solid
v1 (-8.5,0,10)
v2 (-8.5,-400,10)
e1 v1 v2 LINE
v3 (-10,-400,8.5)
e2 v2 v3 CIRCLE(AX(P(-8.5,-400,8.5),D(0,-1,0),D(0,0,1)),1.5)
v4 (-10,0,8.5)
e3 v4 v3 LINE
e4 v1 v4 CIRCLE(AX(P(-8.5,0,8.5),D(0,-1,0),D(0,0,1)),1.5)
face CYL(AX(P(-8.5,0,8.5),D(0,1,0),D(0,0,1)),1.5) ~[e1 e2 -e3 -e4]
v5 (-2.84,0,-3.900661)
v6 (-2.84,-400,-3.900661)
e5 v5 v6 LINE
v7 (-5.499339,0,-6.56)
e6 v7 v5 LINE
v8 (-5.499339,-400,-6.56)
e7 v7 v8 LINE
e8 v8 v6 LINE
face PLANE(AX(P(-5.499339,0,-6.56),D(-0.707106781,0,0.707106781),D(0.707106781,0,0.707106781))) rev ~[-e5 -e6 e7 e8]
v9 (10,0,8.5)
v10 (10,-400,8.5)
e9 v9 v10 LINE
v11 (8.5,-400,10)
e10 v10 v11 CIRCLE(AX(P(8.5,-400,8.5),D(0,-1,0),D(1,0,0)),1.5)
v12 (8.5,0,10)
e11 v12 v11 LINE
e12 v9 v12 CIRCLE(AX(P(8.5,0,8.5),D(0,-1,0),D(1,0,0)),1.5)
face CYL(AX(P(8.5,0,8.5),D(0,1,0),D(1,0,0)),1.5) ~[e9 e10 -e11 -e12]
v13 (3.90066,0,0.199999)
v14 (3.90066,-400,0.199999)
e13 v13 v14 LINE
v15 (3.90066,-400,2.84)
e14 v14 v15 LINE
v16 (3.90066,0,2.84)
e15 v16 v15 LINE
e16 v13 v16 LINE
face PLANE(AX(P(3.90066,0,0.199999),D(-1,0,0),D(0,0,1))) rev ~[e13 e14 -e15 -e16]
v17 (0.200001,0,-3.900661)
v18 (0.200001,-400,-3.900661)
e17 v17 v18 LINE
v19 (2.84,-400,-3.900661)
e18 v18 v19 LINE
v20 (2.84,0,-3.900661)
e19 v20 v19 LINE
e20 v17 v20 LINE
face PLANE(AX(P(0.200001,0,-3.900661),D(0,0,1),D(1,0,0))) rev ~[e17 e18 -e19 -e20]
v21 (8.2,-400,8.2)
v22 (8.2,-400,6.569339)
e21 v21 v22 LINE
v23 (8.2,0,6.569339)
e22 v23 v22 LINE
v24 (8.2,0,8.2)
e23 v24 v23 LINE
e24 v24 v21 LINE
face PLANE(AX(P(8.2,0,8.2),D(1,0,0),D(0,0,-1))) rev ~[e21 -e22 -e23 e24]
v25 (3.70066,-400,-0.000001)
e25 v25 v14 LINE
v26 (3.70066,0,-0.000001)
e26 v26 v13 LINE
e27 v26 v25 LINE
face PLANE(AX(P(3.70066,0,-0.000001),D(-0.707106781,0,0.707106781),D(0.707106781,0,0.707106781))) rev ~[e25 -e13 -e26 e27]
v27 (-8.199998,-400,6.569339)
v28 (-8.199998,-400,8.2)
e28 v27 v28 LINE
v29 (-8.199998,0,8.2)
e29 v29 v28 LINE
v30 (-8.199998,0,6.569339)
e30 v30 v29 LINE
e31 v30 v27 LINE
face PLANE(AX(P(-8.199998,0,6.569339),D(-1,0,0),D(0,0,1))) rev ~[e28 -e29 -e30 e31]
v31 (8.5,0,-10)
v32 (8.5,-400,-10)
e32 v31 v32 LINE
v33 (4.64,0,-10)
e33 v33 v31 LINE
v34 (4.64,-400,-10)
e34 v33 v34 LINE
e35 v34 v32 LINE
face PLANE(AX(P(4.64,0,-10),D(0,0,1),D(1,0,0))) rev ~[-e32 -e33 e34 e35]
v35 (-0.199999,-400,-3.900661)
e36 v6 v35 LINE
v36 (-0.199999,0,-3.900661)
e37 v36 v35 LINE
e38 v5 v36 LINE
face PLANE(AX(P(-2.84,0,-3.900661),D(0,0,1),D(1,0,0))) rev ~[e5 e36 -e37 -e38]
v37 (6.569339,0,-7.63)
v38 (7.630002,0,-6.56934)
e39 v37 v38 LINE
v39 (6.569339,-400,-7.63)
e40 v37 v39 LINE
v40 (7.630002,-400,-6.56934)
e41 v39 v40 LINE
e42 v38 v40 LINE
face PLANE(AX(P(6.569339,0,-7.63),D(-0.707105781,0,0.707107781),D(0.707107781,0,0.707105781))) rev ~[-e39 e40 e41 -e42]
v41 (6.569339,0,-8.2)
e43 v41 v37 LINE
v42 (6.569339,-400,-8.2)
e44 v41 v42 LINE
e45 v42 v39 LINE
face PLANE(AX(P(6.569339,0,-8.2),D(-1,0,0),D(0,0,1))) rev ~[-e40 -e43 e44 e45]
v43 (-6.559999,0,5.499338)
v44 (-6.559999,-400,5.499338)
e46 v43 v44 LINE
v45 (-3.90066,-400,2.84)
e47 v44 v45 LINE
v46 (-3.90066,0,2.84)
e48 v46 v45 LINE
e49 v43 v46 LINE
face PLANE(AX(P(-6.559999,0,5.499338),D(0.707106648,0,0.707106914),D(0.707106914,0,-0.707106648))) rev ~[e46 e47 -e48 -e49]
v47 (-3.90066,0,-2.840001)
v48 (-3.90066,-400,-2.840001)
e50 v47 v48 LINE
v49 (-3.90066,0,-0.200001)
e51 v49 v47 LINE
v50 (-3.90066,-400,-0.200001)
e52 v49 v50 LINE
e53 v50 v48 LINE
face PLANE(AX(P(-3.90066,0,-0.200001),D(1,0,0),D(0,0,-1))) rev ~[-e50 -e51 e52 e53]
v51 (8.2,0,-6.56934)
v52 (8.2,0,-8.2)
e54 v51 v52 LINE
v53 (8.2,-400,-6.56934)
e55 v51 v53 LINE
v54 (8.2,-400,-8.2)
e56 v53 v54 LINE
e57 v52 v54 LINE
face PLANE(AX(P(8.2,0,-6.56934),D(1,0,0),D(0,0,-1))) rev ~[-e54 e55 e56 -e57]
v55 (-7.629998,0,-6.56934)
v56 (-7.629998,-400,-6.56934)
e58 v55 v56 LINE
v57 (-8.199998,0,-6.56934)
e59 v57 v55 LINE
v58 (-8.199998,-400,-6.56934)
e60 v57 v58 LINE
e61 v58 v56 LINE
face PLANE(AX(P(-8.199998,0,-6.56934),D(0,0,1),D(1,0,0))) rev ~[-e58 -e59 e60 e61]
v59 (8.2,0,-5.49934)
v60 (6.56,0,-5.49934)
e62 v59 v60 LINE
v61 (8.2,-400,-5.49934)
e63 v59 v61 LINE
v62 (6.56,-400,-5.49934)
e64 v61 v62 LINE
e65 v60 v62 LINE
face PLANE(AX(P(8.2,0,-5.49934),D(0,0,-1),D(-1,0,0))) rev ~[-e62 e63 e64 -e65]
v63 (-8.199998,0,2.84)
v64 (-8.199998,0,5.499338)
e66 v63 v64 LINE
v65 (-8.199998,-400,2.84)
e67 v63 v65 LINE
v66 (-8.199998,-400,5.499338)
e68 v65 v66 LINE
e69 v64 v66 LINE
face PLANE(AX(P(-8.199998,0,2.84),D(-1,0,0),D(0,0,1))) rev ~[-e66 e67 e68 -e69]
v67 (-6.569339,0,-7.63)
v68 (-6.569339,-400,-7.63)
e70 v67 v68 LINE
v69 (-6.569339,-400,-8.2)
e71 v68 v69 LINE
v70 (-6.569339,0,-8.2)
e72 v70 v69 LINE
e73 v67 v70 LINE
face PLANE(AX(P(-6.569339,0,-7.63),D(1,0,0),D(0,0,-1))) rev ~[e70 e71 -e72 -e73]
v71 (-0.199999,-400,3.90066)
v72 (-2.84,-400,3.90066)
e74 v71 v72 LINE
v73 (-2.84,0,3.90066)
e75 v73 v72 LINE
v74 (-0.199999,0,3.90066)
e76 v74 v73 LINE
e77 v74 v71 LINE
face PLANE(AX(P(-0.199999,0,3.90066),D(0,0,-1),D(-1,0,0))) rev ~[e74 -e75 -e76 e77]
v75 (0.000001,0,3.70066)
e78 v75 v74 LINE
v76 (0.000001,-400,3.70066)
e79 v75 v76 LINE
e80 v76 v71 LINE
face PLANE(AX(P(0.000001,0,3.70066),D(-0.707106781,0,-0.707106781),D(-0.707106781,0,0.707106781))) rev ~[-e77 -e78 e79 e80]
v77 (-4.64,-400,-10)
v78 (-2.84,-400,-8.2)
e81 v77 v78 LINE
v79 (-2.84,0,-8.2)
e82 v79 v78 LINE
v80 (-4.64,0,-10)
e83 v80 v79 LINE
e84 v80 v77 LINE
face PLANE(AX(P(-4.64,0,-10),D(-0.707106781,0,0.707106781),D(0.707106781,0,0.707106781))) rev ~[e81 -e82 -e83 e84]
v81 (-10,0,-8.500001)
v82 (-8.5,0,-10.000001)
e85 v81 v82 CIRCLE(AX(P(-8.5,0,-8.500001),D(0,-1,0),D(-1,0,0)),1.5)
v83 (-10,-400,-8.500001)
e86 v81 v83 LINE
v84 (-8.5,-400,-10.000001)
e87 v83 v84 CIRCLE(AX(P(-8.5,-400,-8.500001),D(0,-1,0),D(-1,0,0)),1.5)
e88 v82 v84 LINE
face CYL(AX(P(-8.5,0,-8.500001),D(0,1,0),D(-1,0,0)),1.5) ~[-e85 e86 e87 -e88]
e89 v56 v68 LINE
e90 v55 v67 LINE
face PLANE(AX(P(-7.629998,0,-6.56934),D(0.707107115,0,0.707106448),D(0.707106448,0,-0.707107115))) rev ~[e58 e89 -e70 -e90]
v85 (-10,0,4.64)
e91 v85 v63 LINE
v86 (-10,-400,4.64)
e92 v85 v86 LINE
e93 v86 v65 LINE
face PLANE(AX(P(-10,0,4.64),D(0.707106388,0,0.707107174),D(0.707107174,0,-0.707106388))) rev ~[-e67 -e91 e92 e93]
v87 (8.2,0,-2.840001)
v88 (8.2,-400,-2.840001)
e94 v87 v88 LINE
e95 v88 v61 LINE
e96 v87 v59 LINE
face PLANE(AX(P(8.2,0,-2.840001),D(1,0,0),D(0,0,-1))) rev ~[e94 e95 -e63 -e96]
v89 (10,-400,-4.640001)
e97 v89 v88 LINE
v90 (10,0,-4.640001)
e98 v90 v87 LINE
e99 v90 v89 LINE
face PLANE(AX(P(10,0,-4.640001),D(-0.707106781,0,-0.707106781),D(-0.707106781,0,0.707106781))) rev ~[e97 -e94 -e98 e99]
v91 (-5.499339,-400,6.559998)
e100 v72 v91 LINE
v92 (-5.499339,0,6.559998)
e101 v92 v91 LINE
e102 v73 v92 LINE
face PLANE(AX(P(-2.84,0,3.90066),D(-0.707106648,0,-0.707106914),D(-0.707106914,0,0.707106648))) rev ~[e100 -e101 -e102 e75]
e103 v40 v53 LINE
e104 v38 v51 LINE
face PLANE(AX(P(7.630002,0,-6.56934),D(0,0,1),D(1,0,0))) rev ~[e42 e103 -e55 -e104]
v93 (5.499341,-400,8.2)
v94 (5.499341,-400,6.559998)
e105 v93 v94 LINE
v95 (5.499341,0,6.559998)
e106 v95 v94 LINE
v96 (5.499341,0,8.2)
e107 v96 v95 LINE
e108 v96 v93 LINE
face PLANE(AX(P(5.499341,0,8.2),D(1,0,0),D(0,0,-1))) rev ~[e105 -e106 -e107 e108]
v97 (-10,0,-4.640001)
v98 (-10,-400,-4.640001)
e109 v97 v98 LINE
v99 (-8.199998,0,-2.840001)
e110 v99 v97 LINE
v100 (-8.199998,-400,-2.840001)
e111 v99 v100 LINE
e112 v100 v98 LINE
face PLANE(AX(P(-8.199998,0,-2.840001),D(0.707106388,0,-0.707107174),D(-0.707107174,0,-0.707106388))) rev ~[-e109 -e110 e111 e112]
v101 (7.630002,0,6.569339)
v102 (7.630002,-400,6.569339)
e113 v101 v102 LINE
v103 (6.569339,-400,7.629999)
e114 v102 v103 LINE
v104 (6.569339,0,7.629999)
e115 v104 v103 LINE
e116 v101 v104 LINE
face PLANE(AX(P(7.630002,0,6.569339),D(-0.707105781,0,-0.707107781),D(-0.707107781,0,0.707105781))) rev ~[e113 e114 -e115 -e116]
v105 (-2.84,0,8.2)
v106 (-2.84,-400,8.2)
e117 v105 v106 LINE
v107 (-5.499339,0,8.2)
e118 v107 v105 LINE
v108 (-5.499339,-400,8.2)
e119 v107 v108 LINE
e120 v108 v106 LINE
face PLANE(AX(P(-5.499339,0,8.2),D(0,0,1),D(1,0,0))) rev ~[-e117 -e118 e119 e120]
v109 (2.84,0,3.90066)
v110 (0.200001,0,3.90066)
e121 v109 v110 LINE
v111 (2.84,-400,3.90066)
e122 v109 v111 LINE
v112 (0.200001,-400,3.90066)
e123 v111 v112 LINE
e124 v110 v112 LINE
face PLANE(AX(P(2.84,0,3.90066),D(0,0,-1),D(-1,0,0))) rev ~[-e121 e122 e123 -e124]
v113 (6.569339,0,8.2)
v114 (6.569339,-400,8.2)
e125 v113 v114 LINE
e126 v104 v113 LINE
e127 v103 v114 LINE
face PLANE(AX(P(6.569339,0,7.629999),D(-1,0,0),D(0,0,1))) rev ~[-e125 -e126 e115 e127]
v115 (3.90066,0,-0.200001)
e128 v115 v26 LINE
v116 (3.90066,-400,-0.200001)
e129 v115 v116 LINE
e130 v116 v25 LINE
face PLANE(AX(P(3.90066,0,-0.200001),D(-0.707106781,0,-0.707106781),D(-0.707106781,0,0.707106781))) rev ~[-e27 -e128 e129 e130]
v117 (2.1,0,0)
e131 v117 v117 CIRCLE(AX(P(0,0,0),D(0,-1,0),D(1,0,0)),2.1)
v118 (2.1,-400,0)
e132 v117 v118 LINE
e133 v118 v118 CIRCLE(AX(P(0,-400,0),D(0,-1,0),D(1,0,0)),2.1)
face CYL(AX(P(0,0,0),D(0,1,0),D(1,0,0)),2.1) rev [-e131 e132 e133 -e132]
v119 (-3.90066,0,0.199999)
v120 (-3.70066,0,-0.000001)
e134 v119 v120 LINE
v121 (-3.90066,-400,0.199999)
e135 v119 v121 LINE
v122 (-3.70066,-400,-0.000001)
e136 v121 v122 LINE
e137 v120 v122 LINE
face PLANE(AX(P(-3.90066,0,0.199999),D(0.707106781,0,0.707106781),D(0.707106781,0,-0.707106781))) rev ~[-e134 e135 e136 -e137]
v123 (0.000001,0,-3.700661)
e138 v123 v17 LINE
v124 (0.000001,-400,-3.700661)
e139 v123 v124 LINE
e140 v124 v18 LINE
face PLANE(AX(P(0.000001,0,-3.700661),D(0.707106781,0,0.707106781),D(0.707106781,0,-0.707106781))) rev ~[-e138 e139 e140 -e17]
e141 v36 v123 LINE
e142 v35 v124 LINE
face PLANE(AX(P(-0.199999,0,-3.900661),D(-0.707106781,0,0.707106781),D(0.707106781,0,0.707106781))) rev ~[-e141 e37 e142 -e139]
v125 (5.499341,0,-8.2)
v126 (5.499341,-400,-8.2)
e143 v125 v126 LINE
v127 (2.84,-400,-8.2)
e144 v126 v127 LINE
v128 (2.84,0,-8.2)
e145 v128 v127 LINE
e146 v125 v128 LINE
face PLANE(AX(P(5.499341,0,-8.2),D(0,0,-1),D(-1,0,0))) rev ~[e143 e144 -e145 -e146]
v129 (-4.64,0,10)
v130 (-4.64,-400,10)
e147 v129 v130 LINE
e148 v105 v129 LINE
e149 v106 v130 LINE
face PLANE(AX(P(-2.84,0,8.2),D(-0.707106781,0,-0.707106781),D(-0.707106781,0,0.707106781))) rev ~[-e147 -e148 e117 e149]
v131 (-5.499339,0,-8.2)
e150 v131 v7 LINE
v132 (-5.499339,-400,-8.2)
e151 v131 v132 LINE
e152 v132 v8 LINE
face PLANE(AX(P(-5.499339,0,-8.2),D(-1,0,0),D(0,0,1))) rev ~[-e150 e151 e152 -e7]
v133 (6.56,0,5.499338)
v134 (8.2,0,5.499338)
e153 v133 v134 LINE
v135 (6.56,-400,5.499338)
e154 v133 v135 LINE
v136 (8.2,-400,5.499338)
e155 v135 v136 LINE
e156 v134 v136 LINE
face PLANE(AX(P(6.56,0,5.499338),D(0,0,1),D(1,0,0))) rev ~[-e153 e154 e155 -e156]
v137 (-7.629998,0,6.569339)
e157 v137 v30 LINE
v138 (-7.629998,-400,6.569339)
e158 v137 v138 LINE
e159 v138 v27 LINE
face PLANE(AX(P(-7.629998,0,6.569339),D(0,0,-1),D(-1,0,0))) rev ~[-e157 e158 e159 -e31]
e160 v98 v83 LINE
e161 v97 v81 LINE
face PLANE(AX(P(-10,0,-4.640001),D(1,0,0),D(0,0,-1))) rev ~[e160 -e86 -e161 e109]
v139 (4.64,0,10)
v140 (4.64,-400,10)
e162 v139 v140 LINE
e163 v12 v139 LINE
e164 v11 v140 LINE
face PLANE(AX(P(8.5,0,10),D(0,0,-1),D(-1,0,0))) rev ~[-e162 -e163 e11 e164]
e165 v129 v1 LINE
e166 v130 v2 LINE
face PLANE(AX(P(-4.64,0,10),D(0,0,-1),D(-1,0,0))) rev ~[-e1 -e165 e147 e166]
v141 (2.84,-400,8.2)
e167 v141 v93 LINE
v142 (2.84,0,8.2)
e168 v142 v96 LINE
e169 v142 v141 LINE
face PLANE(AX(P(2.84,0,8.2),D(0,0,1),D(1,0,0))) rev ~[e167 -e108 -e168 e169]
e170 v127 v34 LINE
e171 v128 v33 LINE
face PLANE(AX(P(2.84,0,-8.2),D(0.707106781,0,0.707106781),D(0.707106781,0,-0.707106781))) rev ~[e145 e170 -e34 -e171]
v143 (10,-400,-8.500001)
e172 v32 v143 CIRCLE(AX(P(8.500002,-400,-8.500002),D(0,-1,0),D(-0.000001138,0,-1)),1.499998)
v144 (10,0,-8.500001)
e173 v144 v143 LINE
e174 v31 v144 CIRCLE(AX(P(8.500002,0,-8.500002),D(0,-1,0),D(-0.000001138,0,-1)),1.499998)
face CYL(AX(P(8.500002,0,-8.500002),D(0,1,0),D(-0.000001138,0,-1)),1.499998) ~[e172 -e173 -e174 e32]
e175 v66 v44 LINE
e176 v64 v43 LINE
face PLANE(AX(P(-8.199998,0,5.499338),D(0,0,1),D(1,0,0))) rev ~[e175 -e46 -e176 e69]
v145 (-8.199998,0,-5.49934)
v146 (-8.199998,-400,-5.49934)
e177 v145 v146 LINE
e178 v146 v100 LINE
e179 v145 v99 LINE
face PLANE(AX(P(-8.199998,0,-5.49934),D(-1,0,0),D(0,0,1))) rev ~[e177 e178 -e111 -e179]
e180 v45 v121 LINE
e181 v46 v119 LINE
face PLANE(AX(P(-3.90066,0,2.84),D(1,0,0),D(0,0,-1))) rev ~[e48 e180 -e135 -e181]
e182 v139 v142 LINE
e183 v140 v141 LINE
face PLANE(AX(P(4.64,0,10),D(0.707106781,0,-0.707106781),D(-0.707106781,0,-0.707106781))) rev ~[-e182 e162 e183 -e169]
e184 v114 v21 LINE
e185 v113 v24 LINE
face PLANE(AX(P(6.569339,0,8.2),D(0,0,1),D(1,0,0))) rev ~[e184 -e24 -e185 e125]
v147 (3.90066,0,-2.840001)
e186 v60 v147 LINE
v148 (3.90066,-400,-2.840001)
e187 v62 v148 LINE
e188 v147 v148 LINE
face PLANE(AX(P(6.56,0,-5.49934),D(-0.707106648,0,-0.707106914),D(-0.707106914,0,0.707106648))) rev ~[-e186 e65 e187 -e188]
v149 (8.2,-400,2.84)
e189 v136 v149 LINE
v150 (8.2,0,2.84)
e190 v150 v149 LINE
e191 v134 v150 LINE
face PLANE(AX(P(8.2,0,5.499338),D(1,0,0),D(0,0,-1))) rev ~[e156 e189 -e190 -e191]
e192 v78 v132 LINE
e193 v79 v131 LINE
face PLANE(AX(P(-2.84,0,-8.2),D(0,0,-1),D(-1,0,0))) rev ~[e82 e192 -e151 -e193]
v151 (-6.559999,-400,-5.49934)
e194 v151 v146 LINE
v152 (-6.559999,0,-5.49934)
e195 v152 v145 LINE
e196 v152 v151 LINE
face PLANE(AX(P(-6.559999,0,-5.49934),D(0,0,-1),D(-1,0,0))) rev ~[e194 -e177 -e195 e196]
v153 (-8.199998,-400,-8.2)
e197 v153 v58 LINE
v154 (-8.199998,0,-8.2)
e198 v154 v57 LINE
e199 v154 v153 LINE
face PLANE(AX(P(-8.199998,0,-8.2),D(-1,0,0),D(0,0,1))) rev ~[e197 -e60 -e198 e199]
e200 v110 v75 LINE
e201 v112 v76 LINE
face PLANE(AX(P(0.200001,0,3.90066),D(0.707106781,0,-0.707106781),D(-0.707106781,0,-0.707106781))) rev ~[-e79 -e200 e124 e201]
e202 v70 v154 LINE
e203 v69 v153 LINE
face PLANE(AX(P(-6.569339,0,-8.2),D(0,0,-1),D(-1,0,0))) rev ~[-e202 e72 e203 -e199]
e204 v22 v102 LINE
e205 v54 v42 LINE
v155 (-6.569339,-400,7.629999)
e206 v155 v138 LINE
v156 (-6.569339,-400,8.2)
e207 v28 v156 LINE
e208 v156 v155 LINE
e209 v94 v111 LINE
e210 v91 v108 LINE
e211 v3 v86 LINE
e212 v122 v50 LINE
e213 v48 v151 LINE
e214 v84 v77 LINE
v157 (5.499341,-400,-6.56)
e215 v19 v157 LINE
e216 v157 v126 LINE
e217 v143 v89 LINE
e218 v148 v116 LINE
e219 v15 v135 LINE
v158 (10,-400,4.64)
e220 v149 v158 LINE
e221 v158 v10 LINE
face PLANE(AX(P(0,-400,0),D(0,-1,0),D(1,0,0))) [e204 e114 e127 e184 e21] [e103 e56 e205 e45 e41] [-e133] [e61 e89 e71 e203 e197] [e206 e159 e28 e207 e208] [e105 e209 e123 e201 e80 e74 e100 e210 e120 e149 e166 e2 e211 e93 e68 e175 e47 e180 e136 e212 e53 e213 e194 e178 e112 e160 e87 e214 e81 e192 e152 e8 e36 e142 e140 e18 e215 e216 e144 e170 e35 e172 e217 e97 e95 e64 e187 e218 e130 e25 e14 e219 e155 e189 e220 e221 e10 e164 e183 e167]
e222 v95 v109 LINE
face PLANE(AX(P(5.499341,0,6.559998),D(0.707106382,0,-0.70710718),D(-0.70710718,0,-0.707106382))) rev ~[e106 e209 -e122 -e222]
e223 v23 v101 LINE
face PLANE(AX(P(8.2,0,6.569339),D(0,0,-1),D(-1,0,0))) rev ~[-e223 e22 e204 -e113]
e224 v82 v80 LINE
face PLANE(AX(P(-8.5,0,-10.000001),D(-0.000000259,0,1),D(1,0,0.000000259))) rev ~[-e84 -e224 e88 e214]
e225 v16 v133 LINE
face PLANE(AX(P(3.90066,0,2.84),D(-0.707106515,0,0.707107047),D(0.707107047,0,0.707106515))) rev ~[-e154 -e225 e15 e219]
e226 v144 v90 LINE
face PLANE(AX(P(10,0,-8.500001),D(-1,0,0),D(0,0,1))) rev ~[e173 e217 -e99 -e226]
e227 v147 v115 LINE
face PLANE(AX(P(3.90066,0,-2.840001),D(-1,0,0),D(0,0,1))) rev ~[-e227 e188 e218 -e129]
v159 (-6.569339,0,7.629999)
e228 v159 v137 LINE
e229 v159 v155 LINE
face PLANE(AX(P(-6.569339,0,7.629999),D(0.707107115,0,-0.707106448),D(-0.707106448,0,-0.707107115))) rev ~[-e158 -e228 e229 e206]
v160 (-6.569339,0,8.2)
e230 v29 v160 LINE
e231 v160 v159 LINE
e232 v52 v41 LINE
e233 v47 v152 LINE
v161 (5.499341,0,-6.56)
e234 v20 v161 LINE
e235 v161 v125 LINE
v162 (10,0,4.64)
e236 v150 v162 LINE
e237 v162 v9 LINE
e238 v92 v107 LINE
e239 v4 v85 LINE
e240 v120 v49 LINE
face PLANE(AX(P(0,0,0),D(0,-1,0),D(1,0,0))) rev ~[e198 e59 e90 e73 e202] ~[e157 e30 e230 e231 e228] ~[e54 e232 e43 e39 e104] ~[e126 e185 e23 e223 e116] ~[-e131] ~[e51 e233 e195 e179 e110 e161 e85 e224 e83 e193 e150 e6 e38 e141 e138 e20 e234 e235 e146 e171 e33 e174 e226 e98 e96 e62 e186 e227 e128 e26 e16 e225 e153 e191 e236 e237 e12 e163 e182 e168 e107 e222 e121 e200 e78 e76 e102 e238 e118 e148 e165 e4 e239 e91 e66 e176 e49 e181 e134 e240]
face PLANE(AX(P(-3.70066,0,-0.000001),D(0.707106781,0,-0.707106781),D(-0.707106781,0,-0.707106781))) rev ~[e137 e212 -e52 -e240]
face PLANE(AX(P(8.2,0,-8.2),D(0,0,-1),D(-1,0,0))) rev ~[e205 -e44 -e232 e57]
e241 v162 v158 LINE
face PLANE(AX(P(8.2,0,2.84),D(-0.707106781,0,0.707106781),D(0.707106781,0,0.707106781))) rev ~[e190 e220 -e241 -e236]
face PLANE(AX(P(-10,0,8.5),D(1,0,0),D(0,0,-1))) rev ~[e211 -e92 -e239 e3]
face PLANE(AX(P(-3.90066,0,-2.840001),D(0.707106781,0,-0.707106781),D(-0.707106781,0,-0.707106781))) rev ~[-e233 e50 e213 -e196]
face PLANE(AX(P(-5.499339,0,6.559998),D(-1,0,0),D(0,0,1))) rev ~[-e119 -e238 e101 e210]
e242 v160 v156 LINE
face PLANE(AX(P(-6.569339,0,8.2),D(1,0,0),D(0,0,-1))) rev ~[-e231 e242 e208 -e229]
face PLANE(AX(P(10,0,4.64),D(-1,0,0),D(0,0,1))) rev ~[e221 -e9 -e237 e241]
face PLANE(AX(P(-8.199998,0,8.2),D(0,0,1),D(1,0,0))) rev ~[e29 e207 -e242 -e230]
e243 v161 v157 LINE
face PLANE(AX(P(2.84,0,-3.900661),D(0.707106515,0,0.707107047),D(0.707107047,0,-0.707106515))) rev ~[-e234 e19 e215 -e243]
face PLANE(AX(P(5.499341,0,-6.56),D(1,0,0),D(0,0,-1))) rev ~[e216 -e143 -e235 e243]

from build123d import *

# Parameters (mm, degrees)
F0_R     = 2.09999979
F1_DEPTH = 400


# Not quite as in the source:
# - ends of sketch curves that miss each other by under 0.0002 mm in the source are joined


with BuildPart() as f1:
    # F0 (on Front) → F1 (new body)
    with BuildSketch(Plane.XZ):
        with BuildLine():
            Line((-4.639999536, 10), (-8.50000015, 10))
            ThreePointArc((-8.50000015, 10), (-9.5606602157, 9.5606602157), (-10, 8.50000015))
            Line((-10, 8.50000015), (-10, 4.639999536))
            Line((-10, 4.639999536), (-8.19999818, 2.839999716))
            Line((-8.19999818, 2.839999716), (-8.19999818, 5.4993384501))
            Line((-8.19999818, 5.4993384501), (-6.559999344, 5.4993384501))
            Line((-6.559999344, 5.4993384501), (-3.9006596099, 2.839999716))
            Line((-3.9006596099, 2.839999716), (-3.9006596099, 0.19999898))
            Line((-3.9006596099, 0.19999898), (-3.7006596299, -1e-06))
            Line((-3.7006596299, -1e-06), (-3.9006596099, -0.20000098))
            Line((-3.9006596099, -0.20000098), (-3.9006596099, -2.840000716))
            Line((-3.9006596099, -2.840000716), (-6.559999344, -5.4993404501))
            Line((-6.559999344, -5.4993404501), (-8.19999818, -5.4993404501))
            Line((-8.19999818, -5.4993404501), (-8.19999818, -2.840000716))
            Line((-8.19999818, -2.840000716), (-10, -4.640000536))
            Line((-10, -4.640000536), (-10, -8.50000115))
            ThreePointArc((-10, -8.50000115), (-9.5606602157, -9.5606612157), (-8.50000015, -10.000001))
            Line((-8.50000015, -10.000001), (-4.639999536, -10))
            Line((-4.639999536, -10), (-2.839999716, -8.20000018))
            Line((-2.839999716, -8.20000018), (-5.4993394501, -8.20000018))
            Line((-5.4993394501, -8.20000018), (-5.4993394501, -6.560000344))
            Line((-5.4993394501, -6.560000344), (-2.839999716, -3.9006606099))
            Line((-2.839999716, -3.9006606099), (-0.19999898, -3.9006606099))
            Line((-0.19999898, -3.9006606099), (1e-06, -3.7006606299))
            Line((1e-06, -3.7006606299), (0.20000098, -3.9006606099))
            Line((0.20000098, -3.9006606099), (2.839999716, -3.9006606099))
            Line((2.839999716, -3.9006606099), (5.4993414501, -6.560000344))
            Line((5.4993414501, -6.560000344), (5.4993414501, -8.20000018))
            Line((5.4993414501, -8.20000018), (2.839999716, -8.20000018))
            Line((2.839999716, -8.20000018), (4.639999536, -10))
            Line((4.639999536, -10), (8.50000015, -10))
            ThreePointArc((8.50000015, -10), (9.5606602157, -9.5606612157), (10, -8.50000115))
            Line((10, -8.50000115), (10, -4.640000536))
            Line((10, -4.640000536), (8.20000018, -2.840000716))
            Line((8.20000018, -2.840000716), (8.20000018, -5.4993404501))
            Line((8.20000018, -5.4993404501), (6.560000344, -5.4993404501))
            Line((6.560000344, -5.4993404501), (3.9006596099, -2.840000716))
            Line((3.9006596099, -2.840000716), (3.9006596099, -0.20000098))
            Line((3.9006596099, -0.20000098), (3.7006596299, -1e-06))
            Line((3.7006596299, -1e-06), (3.9006596099, 0.19999898))
            Line((3.9006596099, 0.19999898), (3.9006596099, 2.839999716))
            Line((3.9006596099, 2.839999716), (6.560000344, 5.4993384501))
            Line((6.560000344, 5.4993384501), (8.20000018, 5.4993384501))
            Line((8.20000018, 5.4993384501), (8.20000018, 2.839999716))
            Line((8.20000018, 2.839999716), (10, 4.639999536))
            Line((10, 4.639999536), (10, 8.50000015))
            ThreePointArc((10, 8.50000015), (9.5606602157, 9.5606602157), (8.50000015, 10))
            Line((8.50000015, 10), (4.639999536, 10))
            Line((4.639999536, 10), (2.839999716, 8.20000018))
            Line((2.839999716, 8.20000018), (5.4993414501, 8.20000018))
            Line((5.4993414501, 8.20000018), (5.4993414501, 6.559998344))
            Line((5.4993414501, 6.559998344), (2.839999716, 3.9006596099))
            Line((2.839999716, 3.9006596099), (0.20000098, 3.9006596099))
            Line((0.20000098, 3.9006596099), (1e-06, 3.7006596299))
            Line((1e-06, 3.7006596299), (-0.19999898, 3.9006596099))
            Line((-0.19999898, 3.9006596099), (-2.839999716, 3.9006596099))
            Line((-2.839999716, 3.9006596099), (-5.4993394501, 6.559998344))
            Line((-5.4993394501, 6.559998344), (-5.4993394501, 8.20000018))
            Line((-5.4993394501, 8.20000018), (-2.839999716, 8.20000018))
            Line((-2.839999716, 8.20000018), (-4.639999536, 10))
        make_face()
        Polygon((-6.5693393431, -8.20000018), (-8.19999818, -8.20000018), (-8.19999818, -6.5693403431), (-7.629998237, -6.5693403431), (-6.5693393431, -7.630000237), align=None, mode=Mode.SUBTRACT)
        Polygon((8.20000018, -8.20000018), (6.5693393431, -8.20000018), (6.5693393431, -7.630000237), (7.630002237, -6.5693403431), (8.20000018, -6.5693403431), align=None, mode=Mode.SUBTRACT)
        with Locations((1e-06, -1e-06)):
            Circle(F0_R, mode=Mode.SUBTRACT)
        Polygon((-8.19999818, 8.20000018), (-6.5693393431, 8.20000018), (-6.5693393431, 7.629999237), (-7.629998237, 6.5693393431), (-8.19999818, 6.5693393431), align=None, mode=Mode.SUBTRACT)
        Polygon((6.5693393431, 8.20000018), (8.20000018, 8.20000018), (8.20000018, 6.5693393431), (7.630002237, 6.5693393431), (6.5693393431, 7.629999237), align=None, mode=Mode.SUBTRACT)
    extrude(amount=F1_DEPTH)


solid = f1.part
